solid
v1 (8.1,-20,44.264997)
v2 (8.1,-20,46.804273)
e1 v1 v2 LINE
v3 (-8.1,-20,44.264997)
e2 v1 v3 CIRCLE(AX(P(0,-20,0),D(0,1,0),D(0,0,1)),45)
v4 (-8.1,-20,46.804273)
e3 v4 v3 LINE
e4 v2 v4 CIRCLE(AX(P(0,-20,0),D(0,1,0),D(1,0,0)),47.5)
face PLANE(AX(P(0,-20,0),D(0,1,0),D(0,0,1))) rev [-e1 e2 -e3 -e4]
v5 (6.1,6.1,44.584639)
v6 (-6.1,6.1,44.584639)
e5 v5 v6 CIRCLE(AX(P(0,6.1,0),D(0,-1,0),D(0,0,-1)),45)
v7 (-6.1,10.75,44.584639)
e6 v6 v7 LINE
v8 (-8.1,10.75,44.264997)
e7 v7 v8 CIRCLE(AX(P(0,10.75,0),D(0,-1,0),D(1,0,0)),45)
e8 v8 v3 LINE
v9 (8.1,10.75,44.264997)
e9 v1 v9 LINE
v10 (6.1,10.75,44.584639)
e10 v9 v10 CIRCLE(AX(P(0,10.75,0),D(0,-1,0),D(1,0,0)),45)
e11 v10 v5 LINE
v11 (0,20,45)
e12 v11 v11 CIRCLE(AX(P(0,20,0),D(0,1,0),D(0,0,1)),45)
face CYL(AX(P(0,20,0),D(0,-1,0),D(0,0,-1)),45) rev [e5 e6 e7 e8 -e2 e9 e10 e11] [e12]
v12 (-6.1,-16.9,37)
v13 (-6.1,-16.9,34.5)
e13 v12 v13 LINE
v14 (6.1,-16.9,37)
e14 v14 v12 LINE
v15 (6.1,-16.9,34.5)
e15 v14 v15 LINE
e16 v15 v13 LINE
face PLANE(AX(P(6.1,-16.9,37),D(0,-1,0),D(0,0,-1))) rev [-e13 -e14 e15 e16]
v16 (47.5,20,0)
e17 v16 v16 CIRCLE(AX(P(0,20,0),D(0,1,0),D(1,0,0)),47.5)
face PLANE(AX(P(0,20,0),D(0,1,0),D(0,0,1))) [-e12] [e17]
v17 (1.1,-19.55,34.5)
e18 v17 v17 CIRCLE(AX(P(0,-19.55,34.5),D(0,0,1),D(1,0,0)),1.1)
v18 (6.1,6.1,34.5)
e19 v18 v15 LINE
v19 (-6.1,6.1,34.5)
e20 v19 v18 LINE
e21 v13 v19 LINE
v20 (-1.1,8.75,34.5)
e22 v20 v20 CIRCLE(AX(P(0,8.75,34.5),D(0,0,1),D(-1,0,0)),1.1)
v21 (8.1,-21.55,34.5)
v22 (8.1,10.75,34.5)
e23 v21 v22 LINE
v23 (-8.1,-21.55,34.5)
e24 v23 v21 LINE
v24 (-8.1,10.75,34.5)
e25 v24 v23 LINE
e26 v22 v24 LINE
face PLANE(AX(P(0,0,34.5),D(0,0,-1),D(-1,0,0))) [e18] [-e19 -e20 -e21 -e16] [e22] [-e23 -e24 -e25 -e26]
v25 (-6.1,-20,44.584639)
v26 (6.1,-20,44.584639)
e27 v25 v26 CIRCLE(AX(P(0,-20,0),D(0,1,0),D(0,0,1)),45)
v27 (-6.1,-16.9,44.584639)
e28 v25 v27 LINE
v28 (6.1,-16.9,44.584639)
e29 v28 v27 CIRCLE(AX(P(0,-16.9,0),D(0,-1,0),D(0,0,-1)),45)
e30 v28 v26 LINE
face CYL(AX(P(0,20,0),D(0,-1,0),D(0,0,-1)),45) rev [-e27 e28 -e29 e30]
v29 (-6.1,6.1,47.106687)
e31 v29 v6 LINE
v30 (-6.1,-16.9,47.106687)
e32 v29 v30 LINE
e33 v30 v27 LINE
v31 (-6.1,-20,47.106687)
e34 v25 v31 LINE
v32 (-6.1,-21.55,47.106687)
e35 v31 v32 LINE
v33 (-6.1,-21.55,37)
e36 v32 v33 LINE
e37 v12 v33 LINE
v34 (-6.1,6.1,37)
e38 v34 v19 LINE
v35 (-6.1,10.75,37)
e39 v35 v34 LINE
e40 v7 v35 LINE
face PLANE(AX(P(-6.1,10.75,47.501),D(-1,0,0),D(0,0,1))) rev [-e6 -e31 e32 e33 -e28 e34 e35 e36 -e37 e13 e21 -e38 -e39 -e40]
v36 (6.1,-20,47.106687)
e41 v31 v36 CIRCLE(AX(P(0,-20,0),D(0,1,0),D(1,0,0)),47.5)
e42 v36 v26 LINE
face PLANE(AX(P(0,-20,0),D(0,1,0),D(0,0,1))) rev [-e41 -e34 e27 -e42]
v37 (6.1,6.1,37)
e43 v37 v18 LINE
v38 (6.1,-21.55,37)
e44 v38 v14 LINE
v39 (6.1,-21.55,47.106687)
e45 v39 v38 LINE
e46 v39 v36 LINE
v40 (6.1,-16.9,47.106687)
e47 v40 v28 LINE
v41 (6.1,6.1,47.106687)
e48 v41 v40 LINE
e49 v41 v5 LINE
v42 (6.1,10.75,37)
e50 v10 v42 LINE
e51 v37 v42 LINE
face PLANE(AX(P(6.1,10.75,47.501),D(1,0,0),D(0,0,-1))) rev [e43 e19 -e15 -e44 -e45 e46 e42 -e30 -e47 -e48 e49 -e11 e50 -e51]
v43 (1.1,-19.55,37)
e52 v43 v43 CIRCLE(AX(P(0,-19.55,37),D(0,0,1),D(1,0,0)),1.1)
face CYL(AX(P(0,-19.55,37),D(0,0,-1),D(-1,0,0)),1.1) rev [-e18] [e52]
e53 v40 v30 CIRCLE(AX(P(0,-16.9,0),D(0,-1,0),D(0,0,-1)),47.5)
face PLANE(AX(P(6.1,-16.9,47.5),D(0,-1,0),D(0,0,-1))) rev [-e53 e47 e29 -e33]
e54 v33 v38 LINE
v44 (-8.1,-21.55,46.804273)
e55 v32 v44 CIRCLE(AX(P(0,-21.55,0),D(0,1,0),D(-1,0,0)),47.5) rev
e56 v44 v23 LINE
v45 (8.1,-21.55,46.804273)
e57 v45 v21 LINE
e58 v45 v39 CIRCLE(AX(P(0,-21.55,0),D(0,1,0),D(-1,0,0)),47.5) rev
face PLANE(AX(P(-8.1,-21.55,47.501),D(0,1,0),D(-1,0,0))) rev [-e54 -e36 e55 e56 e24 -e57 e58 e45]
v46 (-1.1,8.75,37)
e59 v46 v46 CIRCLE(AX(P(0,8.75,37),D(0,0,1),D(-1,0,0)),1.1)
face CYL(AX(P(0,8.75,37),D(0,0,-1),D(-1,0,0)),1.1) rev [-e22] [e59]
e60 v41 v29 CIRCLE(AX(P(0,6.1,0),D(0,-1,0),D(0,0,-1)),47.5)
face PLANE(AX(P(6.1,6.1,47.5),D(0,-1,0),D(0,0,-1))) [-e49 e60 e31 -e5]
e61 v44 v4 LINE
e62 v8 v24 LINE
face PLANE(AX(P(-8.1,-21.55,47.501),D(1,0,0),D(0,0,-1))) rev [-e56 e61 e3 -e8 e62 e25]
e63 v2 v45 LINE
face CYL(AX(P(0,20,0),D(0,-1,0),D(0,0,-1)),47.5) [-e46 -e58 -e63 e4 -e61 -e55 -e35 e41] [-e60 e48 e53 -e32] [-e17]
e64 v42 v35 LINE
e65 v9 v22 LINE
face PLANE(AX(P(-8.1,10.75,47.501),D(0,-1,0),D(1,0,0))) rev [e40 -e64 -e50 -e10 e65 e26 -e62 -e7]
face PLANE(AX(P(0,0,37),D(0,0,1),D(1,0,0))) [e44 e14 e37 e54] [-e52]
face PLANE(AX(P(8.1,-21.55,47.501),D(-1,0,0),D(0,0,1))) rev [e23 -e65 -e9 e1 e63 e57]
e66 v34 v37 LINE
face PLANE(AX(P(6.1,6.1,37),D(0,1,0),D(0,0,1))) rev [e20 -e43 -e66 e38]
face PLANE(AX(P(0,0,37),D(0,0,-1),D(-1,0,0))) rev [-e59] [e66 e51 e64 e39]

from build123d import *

# Parameters (mm, degrees)
SKETCH1_R                = 47.5
SKETCH1_R_2              = 45
EXTRUDE_THIN1_DEPTH      = 20
BOSS_EXTRUDE1_REACH      = 98.852
BOSS_EXTRUDE1_END_RADIUS = 47.5
SKETCH2_W                = 2
SKETCH2_H                = 32.3
SKETCH3_W                = 12.2
SKETCH3_H                = 4.65
SKETCH3_R                = 1.1
BOSS_EXTRUDE2_DEPTH      = 2.5
SKETCH4_W                = 12.2
SKETCH4_H                = 23
CUT_EXTRUDE1_DEPTH       = 98.183602012


with BuildPart() as part:
    # Sketch1 → Extrude-Thin1 (new, symmetric)
    with BuildSketch(Plane(origin=(0, 0, 0), x_dir=(1, 0, 0), z_dir=(0, 1, 0))):
        Circle(SKETCH1_R)
        Circle(SKETCH1_R_2, mode=Mode.SUBTRACT)
    extrude(amount=EXTRUDE_THIN1_DEPTH, both=True)

    # Boss-Extrude1: up to this cylinder (the profile starts inside it)
    boss_extrude1_end = Plane(origin=(0, -5.4, 0), z_dir=(0, -1, 0)) * Cylinder(BOSS_EXTRUDE1_END_RADIUS, 293.704, mode=Mode.PRIVATE)
    # Sketch2 → Boss-Extrude1 (add, up to the surface)
    with BuildSketch(Plane.XY.offset(34.5), mode=Mode.PRIVATE) as boss_extrude1_sk1:
        with Locations((-7.1, -5.4)):
            Rectangle(SKETCH2_W, SKETCH2_H)
    boss_extrude1_tool1 = extrude(boss_extrude1_sk1.sketch, amount=BOSS_EXTRUDE1_REACH, mode=Mode.PRIVATE) & boss_extrude1_end
    add(boss_extrude1_tool1.solids().sort_by_distance((-7.1, -5.4, 34.5))[0])
    # Sketch2 → Boss-Extrude1 (add, up to the surface)
    with BuildSketch(Plane.XY.offset(34.5), mode=Mode.PRIVATE) as boss_extrude1_sk2:
        with Locations((7.1, -5.4)):
            Rectangle(SKETCH2_W, SKETCH2_H)
    boss_extrude1_tool2 = extrude(boss_extrude1_sk2.sketch, amount=BOSS_EXTRUDE1_REACH, mode=Mode.PRIVATE) & boss_extrude1_end
    add(boss_extrude1_tool2.solids().sort_by_distance((7.1, -5.4, 34.5))[0])

    # Sketch3 → Boss-Extrude2 (add)
    # profile 1 of 2: a face of its own
    with BuildSketch(Plane.XY.offset(34.5)):
        with Locations((0, -19.225)):
            Rectangle(SKETCH3_W, SKETCH3_H)
        with Locations((0, -19.55)):
            Circle(SKETCH3_R, mode=Mode.SUBTRACT)
    # profile 2 of 2: a face of its own
    with BuildSketch(Plane.XY.offset(34.5)):
        with Locations((0, 8.425)):
            Rectangle(SKETCH3_W, SKETCH3_H)
        with Locations((0, 8.75)):
            Circle(SKETCH3_R, mode=Mode.SUBTRACT)
    extrude(amount=BOSS_EXTRUDE2_DEPTH)

    # Sketch4 → Cut-Extrude1 (cut, through all)
    with BuildSketch(Plane.XY.offset(34.5)):
        with Locations((0, -5.4)):
            Rectangle(SKETCH4_W, SKETCH4_H)
    extrude(amount=CUT_EXTRUDE1_DEPTH, mode=Mode.SUBTRACT)


solid = part.part
